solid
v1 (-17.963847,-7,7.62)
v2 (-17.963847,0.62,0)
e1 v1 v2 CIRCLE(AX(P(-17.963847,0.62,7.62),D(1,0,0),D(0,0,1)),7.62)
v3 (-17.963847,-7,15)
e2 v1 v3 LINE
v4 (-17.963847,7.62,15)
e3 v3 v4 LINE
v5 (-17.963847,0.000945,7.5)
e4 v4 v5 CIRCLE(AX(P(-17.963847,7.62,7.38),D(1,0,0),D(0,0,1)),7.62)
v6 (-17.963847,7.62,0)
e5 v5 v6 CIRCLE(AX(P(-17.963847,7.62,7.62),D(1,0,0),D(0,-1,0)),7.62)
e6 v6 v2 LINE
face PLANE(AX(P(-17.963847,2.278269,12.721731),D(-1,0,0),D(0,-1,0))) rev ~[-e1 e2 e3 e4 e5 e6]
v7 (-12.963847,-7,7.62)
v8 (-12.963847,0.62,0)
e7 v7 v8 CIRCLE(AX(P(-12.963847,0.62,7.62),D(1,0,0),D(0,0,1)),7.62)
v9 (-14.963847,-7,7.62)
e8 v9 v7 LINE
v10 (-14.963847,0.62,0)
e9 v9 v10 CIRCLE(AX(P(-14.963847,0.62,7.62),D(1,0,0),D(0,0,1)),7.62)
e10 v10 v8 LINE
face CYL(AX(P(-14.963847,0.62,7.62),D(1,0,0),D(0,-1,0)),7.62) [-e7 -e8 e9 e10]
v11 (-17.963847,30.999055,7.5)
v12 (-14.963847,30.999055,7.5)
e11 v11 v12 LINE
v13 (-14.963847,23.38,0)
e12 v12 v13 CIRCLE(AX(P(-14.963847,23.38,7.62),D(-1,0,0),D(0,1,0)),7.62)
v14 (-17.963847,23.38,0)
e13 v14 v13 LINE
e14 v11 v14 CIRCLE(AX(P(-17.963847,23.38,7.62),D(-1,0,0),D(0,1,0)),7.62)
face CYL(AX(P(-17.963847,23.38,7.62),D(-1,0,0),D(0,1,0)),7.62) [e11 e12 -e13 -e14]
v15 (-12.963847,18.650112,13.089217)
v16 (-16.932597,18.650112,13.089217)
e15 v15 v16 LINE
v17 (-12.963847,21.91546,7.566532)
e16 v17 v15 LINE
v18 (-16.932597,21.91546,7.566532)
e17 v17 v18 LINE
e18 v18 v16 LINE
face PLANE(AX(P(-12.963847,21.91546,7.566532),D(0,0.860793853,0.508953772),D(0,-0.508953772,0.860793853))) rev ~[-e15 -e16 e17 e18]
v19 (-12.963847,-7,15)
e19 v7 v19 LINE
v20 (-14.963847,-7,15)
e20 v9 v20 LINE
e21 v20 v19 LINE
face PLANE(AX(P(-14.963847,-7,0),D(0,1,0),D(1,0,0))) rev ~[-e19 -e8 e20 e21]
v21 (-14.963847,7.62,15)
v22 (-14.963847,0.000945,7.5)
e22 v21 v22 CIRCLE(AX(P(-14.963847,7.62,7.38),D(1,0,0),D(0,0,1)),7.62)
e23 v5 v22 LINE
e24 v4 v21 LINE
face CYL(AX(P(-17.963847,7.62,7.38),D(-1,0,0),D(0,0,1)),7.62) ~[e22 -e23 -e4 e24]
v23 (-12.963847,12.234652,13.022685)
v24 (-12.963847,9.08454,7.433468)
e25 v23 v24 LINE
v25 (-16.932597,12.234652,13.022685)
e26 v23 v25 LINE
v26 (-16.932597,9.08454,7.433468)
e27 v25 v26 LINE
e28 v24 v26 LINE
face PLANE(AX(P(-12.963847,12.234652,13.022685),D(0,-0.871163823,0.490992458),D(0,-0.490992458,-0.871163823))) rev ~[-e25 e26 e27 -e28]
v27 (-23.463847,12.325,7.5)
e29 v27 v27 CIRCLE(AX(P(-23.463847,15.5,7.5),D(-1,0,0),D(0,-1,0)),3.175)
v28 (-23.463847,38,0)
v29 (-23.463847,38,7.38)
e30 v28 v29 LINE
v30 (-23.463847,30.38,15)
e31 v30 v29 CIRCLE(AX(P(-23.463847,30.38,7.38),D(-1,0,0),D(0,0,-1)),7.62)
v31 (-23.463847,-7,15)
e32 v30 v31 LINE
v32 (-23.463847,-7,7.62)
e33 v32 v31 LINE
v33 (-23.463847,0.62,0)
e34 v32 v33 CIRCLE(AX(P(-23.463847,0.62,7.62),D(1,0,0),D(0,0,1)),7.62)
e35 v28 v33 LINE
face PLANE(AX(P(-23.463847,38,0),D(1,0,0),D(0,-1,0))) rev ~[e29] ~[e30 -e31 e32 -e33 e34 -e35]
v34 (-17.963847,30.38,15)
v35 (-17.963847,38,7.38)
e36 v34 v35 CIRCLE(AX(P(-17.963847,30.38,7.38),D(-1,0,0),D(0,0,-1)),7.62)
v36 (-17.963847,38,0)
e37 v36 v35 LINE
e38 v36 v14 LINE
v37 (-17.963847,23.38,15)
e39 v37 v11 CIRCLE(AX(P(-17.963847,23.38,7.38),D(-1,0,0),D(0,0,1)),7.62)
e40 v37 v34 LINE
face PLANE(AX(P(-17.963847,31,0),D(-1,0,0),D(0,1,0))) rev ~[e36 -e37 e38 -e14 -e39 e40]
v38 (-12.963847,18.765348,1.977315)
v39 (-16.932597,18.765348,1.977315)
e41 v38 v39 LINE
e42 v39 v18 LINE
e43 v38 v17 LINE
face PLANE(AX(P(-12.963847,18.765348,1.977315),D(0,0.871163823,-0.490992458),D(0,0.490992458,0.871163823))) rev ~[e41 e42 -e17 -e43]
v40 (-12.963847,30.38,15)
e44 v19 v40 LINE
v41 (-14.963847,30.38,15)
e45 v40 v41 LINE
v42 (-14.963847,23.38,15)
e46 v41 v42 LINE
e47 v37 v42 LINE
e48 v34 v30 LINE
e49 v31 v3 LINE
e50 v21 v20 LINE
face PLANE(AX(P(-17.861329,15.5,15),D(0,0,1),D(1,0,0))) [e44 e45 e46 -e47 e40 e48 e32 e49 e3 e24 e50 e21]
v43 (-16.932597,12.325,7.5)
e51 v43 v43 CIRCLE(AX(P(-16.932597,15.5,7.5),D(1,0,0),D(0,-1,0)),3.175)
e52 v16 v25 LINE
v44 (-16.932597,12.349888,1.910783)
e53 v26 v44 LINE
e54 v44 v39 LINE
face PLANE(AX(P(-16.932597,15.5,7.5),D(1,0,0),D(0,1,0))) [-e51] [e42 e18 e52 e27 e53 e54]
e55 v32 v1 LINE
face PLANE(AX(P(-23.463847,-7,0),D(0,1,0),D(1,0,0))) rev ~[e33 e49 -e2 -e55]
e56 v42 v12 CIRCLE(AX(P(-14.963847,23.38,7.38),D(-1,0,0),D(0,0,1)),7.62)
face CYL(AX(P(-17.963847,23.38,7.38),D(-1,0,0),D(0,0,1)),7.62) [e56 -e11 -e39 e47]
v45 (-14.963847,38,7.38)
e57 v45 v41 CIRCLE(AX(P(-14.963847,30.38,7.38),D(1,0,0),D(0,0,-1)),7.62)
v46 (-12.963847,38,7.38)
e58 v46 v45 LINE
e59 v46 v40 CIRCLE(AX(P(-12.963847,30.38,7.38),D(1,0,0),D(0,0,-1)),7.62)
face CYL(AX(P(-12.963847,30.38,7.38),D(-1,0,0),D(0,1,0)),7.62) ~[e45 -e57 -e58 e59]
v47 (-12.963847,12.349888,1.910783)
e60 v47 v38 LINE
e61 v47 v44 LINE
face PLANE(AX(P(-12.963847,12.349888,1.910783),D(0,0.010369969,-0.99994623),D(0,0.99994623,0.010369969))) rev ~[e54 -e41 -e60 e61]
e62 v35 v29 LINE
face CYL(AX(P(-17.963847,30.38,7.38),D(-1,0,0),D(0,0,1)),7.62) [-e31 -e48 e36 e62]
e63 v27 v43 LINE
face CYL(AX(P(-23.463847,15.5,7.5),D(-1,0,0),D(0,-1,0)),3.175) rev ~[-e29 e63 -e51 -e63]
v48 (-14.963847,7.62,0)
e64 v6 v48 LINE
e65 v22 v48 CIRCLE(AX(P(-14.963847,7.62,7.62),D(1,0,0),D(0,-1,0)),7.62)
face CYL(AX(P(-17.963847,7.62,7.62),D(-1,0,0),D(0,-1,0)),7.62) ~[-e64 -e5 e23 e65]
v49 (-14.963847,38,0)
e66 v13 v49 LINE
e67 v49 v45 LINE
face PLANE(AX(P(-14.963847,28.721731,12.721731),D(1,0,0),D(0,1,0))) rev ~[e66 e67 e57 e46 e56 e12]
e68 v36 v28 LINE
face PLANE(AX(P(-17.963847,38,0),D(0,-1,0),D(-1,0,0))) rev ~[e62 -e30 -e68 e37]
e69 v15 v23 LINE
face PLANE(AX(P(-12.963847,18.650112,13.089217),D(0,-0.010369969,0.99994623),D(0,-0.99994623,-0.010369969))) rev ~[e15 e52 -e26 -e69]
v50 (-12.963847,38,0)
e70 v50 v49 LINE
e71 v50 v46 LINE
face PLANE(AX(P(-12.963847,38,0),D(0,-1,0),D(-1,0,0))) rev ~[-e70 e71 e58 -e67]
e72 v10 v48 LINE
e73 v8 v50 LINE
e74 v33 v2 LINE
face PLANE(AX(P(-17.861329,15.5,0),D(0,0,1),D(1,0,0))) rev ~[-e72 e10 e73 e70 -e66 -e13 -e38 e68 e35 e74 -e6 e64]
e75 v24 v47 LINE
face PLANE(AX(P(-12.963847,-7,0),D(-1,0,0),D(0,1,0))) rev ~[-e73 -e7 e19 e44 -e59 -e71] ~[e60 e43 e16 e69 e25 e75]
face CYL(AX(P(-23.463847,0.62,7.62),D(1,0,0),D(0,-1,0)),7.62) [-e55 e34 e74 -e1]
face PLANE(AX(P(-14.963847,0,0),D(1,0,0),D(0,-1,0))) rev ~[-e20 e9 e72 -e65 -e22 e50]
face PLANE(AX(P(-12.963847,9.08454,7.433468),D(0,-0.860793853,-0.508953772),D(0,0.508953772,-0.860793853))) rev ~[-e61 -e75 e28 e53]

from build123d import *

# Parameters (mm, degrees)
F1_DEPTH    = 15
F2_R        = 3.175
F3_DEPTH    = 25.4
F4_R        = 3.175
F5_DEPTH    = 3.96875
F6_T1_DEPTH = 3
F7_R        = 7.62


# Not quite as in the source:
# - a fillet or chamfer that OpenCascade refuses, or shapes differently, is made with other operations: its cross-section is extruded or revolved along the edge and cut away or added


with BuildPart() as f1:
    # F0 (on Top) → F1 (new body)
    with BuildSketch(Plane.XY):
        Polygon((-23.4638472274, 38), (-23.4638472274, -7), (-17.9638472274, -7), (-17.9638472274, 0), (-14.9638472274, 0), (-14.9638472274, -7), (-12.9638472274, -7), (-12.9638472274, 38), (-14.9638472274, 38), (-14.9638472274, 31), (-17.9638472274, 31), (-17.9638472274, 38), align=None)
    extrude(amount=F1_DEPTH)

    # F2 (on face) → F3 (cut)
    with BuildSketch(Plane(origin=(-23.4638472274, 0, 0), x_dir=(0, -1, 0), z_dir=(-1, 0, 0))):
        with Locations((-15.5, 7.5)):
            Circle(F2_R)
    extrude(amount=-F3_DEPTH, mode=Mode.SUBTRACT)

    # F4 (on face) → F5 (cut)
    with BuildSketch(Plane.YZ.offset(-12.9638472274)):
        Polygon((21.9154598913, 7.5665316996), (18.6501118036, 13.0892170926), (12.2346519124, 13.022685393), (9.0845401087, 7.4334683004), (12.3498881964, 1.9107829074), (18.7653480876, 1.977314607), align=None)
        with Locations((15.5, 7.5)):
            Circle(F4_R, mode=Mode.SUBTRACT)
    extrude(amount=-F5_DEPTH, mode=Mode.SUBTRACT)

    # F6: fillet of radius 7.62 on 4 edges, made by hand

    # F6_s2 → F6_t1 (cut)
    with BuildSketch(Plane.YZ.offset(-17.9638472274)):
        with BuildLine():
            ThreePointArc((7.62, 15), (2.2318463274, 12.7681536726), (0, 7.38))
            Line((0, 7.38), (-0.1524, 7.38))
            Line((-0.1524, 7.38), (-0.1524, 15.1524))
            Line((-0.1524, 15.1524), (7.62, 15.1524))
            Line((7.62, 15.1524), (7.62, 15))
        make_face()
        with BuildLine():
            ThreePointArc((23.38, 15), (28.7681536726, 12.7681536726), (31, 7.38))
            Line((31, 7.38), (31.1524, 7.38))
            Line((31.1524, 7.38), (31.1524, 15.1524))
            Line((31.1524, 15.1524), (23.38, 15.1524))
            Line((23.38, 15.1524), (23.38, 15))
        make_face()
        with BuildLine():
            ThreePointArc((0, 7.62), (2.2318463274, 2.2318463274), (7.62, 0))
            Line((7.62, 0), (7.62, -0.1524))
            Line((7.62, -0.1524), (-0.1524, -0.1524))
            Line((-0.1524, -0.1524), (-0.1524, 7.62))
            Line((-0.1524, 7.62), (0, 7.62))
        make_face()
        with BuildLine():
            ThreePointArc((31, 7.62), (28.7681536726, 2.2318463274), (23.38, 0))
            Line((23.38, 0), (23.38, -0.1524))
            Line((23.38, -0.1524), (31.1524, -0.1524))
            Line((31.1524, -0.1524), (31.1524, 7.62))
            Line((31.1524, 7.62), (31, 7.62))
        make_face()
    extrude(amount=F6_T1_DEPTH, mode=Mode.SUBTRACT)

    # F7
    f7_edges = [f1.edges().sort_by_distance(p)[0] for p in [
        (-13.963847, 38, 15),
        (-13.963847, -7, 0),
        (-20.713847, -7, 0),
        (-20.713847, 38, 15),
    ]]
    fillet(f7_edges, radius=F7_R)


solid = f1.part
